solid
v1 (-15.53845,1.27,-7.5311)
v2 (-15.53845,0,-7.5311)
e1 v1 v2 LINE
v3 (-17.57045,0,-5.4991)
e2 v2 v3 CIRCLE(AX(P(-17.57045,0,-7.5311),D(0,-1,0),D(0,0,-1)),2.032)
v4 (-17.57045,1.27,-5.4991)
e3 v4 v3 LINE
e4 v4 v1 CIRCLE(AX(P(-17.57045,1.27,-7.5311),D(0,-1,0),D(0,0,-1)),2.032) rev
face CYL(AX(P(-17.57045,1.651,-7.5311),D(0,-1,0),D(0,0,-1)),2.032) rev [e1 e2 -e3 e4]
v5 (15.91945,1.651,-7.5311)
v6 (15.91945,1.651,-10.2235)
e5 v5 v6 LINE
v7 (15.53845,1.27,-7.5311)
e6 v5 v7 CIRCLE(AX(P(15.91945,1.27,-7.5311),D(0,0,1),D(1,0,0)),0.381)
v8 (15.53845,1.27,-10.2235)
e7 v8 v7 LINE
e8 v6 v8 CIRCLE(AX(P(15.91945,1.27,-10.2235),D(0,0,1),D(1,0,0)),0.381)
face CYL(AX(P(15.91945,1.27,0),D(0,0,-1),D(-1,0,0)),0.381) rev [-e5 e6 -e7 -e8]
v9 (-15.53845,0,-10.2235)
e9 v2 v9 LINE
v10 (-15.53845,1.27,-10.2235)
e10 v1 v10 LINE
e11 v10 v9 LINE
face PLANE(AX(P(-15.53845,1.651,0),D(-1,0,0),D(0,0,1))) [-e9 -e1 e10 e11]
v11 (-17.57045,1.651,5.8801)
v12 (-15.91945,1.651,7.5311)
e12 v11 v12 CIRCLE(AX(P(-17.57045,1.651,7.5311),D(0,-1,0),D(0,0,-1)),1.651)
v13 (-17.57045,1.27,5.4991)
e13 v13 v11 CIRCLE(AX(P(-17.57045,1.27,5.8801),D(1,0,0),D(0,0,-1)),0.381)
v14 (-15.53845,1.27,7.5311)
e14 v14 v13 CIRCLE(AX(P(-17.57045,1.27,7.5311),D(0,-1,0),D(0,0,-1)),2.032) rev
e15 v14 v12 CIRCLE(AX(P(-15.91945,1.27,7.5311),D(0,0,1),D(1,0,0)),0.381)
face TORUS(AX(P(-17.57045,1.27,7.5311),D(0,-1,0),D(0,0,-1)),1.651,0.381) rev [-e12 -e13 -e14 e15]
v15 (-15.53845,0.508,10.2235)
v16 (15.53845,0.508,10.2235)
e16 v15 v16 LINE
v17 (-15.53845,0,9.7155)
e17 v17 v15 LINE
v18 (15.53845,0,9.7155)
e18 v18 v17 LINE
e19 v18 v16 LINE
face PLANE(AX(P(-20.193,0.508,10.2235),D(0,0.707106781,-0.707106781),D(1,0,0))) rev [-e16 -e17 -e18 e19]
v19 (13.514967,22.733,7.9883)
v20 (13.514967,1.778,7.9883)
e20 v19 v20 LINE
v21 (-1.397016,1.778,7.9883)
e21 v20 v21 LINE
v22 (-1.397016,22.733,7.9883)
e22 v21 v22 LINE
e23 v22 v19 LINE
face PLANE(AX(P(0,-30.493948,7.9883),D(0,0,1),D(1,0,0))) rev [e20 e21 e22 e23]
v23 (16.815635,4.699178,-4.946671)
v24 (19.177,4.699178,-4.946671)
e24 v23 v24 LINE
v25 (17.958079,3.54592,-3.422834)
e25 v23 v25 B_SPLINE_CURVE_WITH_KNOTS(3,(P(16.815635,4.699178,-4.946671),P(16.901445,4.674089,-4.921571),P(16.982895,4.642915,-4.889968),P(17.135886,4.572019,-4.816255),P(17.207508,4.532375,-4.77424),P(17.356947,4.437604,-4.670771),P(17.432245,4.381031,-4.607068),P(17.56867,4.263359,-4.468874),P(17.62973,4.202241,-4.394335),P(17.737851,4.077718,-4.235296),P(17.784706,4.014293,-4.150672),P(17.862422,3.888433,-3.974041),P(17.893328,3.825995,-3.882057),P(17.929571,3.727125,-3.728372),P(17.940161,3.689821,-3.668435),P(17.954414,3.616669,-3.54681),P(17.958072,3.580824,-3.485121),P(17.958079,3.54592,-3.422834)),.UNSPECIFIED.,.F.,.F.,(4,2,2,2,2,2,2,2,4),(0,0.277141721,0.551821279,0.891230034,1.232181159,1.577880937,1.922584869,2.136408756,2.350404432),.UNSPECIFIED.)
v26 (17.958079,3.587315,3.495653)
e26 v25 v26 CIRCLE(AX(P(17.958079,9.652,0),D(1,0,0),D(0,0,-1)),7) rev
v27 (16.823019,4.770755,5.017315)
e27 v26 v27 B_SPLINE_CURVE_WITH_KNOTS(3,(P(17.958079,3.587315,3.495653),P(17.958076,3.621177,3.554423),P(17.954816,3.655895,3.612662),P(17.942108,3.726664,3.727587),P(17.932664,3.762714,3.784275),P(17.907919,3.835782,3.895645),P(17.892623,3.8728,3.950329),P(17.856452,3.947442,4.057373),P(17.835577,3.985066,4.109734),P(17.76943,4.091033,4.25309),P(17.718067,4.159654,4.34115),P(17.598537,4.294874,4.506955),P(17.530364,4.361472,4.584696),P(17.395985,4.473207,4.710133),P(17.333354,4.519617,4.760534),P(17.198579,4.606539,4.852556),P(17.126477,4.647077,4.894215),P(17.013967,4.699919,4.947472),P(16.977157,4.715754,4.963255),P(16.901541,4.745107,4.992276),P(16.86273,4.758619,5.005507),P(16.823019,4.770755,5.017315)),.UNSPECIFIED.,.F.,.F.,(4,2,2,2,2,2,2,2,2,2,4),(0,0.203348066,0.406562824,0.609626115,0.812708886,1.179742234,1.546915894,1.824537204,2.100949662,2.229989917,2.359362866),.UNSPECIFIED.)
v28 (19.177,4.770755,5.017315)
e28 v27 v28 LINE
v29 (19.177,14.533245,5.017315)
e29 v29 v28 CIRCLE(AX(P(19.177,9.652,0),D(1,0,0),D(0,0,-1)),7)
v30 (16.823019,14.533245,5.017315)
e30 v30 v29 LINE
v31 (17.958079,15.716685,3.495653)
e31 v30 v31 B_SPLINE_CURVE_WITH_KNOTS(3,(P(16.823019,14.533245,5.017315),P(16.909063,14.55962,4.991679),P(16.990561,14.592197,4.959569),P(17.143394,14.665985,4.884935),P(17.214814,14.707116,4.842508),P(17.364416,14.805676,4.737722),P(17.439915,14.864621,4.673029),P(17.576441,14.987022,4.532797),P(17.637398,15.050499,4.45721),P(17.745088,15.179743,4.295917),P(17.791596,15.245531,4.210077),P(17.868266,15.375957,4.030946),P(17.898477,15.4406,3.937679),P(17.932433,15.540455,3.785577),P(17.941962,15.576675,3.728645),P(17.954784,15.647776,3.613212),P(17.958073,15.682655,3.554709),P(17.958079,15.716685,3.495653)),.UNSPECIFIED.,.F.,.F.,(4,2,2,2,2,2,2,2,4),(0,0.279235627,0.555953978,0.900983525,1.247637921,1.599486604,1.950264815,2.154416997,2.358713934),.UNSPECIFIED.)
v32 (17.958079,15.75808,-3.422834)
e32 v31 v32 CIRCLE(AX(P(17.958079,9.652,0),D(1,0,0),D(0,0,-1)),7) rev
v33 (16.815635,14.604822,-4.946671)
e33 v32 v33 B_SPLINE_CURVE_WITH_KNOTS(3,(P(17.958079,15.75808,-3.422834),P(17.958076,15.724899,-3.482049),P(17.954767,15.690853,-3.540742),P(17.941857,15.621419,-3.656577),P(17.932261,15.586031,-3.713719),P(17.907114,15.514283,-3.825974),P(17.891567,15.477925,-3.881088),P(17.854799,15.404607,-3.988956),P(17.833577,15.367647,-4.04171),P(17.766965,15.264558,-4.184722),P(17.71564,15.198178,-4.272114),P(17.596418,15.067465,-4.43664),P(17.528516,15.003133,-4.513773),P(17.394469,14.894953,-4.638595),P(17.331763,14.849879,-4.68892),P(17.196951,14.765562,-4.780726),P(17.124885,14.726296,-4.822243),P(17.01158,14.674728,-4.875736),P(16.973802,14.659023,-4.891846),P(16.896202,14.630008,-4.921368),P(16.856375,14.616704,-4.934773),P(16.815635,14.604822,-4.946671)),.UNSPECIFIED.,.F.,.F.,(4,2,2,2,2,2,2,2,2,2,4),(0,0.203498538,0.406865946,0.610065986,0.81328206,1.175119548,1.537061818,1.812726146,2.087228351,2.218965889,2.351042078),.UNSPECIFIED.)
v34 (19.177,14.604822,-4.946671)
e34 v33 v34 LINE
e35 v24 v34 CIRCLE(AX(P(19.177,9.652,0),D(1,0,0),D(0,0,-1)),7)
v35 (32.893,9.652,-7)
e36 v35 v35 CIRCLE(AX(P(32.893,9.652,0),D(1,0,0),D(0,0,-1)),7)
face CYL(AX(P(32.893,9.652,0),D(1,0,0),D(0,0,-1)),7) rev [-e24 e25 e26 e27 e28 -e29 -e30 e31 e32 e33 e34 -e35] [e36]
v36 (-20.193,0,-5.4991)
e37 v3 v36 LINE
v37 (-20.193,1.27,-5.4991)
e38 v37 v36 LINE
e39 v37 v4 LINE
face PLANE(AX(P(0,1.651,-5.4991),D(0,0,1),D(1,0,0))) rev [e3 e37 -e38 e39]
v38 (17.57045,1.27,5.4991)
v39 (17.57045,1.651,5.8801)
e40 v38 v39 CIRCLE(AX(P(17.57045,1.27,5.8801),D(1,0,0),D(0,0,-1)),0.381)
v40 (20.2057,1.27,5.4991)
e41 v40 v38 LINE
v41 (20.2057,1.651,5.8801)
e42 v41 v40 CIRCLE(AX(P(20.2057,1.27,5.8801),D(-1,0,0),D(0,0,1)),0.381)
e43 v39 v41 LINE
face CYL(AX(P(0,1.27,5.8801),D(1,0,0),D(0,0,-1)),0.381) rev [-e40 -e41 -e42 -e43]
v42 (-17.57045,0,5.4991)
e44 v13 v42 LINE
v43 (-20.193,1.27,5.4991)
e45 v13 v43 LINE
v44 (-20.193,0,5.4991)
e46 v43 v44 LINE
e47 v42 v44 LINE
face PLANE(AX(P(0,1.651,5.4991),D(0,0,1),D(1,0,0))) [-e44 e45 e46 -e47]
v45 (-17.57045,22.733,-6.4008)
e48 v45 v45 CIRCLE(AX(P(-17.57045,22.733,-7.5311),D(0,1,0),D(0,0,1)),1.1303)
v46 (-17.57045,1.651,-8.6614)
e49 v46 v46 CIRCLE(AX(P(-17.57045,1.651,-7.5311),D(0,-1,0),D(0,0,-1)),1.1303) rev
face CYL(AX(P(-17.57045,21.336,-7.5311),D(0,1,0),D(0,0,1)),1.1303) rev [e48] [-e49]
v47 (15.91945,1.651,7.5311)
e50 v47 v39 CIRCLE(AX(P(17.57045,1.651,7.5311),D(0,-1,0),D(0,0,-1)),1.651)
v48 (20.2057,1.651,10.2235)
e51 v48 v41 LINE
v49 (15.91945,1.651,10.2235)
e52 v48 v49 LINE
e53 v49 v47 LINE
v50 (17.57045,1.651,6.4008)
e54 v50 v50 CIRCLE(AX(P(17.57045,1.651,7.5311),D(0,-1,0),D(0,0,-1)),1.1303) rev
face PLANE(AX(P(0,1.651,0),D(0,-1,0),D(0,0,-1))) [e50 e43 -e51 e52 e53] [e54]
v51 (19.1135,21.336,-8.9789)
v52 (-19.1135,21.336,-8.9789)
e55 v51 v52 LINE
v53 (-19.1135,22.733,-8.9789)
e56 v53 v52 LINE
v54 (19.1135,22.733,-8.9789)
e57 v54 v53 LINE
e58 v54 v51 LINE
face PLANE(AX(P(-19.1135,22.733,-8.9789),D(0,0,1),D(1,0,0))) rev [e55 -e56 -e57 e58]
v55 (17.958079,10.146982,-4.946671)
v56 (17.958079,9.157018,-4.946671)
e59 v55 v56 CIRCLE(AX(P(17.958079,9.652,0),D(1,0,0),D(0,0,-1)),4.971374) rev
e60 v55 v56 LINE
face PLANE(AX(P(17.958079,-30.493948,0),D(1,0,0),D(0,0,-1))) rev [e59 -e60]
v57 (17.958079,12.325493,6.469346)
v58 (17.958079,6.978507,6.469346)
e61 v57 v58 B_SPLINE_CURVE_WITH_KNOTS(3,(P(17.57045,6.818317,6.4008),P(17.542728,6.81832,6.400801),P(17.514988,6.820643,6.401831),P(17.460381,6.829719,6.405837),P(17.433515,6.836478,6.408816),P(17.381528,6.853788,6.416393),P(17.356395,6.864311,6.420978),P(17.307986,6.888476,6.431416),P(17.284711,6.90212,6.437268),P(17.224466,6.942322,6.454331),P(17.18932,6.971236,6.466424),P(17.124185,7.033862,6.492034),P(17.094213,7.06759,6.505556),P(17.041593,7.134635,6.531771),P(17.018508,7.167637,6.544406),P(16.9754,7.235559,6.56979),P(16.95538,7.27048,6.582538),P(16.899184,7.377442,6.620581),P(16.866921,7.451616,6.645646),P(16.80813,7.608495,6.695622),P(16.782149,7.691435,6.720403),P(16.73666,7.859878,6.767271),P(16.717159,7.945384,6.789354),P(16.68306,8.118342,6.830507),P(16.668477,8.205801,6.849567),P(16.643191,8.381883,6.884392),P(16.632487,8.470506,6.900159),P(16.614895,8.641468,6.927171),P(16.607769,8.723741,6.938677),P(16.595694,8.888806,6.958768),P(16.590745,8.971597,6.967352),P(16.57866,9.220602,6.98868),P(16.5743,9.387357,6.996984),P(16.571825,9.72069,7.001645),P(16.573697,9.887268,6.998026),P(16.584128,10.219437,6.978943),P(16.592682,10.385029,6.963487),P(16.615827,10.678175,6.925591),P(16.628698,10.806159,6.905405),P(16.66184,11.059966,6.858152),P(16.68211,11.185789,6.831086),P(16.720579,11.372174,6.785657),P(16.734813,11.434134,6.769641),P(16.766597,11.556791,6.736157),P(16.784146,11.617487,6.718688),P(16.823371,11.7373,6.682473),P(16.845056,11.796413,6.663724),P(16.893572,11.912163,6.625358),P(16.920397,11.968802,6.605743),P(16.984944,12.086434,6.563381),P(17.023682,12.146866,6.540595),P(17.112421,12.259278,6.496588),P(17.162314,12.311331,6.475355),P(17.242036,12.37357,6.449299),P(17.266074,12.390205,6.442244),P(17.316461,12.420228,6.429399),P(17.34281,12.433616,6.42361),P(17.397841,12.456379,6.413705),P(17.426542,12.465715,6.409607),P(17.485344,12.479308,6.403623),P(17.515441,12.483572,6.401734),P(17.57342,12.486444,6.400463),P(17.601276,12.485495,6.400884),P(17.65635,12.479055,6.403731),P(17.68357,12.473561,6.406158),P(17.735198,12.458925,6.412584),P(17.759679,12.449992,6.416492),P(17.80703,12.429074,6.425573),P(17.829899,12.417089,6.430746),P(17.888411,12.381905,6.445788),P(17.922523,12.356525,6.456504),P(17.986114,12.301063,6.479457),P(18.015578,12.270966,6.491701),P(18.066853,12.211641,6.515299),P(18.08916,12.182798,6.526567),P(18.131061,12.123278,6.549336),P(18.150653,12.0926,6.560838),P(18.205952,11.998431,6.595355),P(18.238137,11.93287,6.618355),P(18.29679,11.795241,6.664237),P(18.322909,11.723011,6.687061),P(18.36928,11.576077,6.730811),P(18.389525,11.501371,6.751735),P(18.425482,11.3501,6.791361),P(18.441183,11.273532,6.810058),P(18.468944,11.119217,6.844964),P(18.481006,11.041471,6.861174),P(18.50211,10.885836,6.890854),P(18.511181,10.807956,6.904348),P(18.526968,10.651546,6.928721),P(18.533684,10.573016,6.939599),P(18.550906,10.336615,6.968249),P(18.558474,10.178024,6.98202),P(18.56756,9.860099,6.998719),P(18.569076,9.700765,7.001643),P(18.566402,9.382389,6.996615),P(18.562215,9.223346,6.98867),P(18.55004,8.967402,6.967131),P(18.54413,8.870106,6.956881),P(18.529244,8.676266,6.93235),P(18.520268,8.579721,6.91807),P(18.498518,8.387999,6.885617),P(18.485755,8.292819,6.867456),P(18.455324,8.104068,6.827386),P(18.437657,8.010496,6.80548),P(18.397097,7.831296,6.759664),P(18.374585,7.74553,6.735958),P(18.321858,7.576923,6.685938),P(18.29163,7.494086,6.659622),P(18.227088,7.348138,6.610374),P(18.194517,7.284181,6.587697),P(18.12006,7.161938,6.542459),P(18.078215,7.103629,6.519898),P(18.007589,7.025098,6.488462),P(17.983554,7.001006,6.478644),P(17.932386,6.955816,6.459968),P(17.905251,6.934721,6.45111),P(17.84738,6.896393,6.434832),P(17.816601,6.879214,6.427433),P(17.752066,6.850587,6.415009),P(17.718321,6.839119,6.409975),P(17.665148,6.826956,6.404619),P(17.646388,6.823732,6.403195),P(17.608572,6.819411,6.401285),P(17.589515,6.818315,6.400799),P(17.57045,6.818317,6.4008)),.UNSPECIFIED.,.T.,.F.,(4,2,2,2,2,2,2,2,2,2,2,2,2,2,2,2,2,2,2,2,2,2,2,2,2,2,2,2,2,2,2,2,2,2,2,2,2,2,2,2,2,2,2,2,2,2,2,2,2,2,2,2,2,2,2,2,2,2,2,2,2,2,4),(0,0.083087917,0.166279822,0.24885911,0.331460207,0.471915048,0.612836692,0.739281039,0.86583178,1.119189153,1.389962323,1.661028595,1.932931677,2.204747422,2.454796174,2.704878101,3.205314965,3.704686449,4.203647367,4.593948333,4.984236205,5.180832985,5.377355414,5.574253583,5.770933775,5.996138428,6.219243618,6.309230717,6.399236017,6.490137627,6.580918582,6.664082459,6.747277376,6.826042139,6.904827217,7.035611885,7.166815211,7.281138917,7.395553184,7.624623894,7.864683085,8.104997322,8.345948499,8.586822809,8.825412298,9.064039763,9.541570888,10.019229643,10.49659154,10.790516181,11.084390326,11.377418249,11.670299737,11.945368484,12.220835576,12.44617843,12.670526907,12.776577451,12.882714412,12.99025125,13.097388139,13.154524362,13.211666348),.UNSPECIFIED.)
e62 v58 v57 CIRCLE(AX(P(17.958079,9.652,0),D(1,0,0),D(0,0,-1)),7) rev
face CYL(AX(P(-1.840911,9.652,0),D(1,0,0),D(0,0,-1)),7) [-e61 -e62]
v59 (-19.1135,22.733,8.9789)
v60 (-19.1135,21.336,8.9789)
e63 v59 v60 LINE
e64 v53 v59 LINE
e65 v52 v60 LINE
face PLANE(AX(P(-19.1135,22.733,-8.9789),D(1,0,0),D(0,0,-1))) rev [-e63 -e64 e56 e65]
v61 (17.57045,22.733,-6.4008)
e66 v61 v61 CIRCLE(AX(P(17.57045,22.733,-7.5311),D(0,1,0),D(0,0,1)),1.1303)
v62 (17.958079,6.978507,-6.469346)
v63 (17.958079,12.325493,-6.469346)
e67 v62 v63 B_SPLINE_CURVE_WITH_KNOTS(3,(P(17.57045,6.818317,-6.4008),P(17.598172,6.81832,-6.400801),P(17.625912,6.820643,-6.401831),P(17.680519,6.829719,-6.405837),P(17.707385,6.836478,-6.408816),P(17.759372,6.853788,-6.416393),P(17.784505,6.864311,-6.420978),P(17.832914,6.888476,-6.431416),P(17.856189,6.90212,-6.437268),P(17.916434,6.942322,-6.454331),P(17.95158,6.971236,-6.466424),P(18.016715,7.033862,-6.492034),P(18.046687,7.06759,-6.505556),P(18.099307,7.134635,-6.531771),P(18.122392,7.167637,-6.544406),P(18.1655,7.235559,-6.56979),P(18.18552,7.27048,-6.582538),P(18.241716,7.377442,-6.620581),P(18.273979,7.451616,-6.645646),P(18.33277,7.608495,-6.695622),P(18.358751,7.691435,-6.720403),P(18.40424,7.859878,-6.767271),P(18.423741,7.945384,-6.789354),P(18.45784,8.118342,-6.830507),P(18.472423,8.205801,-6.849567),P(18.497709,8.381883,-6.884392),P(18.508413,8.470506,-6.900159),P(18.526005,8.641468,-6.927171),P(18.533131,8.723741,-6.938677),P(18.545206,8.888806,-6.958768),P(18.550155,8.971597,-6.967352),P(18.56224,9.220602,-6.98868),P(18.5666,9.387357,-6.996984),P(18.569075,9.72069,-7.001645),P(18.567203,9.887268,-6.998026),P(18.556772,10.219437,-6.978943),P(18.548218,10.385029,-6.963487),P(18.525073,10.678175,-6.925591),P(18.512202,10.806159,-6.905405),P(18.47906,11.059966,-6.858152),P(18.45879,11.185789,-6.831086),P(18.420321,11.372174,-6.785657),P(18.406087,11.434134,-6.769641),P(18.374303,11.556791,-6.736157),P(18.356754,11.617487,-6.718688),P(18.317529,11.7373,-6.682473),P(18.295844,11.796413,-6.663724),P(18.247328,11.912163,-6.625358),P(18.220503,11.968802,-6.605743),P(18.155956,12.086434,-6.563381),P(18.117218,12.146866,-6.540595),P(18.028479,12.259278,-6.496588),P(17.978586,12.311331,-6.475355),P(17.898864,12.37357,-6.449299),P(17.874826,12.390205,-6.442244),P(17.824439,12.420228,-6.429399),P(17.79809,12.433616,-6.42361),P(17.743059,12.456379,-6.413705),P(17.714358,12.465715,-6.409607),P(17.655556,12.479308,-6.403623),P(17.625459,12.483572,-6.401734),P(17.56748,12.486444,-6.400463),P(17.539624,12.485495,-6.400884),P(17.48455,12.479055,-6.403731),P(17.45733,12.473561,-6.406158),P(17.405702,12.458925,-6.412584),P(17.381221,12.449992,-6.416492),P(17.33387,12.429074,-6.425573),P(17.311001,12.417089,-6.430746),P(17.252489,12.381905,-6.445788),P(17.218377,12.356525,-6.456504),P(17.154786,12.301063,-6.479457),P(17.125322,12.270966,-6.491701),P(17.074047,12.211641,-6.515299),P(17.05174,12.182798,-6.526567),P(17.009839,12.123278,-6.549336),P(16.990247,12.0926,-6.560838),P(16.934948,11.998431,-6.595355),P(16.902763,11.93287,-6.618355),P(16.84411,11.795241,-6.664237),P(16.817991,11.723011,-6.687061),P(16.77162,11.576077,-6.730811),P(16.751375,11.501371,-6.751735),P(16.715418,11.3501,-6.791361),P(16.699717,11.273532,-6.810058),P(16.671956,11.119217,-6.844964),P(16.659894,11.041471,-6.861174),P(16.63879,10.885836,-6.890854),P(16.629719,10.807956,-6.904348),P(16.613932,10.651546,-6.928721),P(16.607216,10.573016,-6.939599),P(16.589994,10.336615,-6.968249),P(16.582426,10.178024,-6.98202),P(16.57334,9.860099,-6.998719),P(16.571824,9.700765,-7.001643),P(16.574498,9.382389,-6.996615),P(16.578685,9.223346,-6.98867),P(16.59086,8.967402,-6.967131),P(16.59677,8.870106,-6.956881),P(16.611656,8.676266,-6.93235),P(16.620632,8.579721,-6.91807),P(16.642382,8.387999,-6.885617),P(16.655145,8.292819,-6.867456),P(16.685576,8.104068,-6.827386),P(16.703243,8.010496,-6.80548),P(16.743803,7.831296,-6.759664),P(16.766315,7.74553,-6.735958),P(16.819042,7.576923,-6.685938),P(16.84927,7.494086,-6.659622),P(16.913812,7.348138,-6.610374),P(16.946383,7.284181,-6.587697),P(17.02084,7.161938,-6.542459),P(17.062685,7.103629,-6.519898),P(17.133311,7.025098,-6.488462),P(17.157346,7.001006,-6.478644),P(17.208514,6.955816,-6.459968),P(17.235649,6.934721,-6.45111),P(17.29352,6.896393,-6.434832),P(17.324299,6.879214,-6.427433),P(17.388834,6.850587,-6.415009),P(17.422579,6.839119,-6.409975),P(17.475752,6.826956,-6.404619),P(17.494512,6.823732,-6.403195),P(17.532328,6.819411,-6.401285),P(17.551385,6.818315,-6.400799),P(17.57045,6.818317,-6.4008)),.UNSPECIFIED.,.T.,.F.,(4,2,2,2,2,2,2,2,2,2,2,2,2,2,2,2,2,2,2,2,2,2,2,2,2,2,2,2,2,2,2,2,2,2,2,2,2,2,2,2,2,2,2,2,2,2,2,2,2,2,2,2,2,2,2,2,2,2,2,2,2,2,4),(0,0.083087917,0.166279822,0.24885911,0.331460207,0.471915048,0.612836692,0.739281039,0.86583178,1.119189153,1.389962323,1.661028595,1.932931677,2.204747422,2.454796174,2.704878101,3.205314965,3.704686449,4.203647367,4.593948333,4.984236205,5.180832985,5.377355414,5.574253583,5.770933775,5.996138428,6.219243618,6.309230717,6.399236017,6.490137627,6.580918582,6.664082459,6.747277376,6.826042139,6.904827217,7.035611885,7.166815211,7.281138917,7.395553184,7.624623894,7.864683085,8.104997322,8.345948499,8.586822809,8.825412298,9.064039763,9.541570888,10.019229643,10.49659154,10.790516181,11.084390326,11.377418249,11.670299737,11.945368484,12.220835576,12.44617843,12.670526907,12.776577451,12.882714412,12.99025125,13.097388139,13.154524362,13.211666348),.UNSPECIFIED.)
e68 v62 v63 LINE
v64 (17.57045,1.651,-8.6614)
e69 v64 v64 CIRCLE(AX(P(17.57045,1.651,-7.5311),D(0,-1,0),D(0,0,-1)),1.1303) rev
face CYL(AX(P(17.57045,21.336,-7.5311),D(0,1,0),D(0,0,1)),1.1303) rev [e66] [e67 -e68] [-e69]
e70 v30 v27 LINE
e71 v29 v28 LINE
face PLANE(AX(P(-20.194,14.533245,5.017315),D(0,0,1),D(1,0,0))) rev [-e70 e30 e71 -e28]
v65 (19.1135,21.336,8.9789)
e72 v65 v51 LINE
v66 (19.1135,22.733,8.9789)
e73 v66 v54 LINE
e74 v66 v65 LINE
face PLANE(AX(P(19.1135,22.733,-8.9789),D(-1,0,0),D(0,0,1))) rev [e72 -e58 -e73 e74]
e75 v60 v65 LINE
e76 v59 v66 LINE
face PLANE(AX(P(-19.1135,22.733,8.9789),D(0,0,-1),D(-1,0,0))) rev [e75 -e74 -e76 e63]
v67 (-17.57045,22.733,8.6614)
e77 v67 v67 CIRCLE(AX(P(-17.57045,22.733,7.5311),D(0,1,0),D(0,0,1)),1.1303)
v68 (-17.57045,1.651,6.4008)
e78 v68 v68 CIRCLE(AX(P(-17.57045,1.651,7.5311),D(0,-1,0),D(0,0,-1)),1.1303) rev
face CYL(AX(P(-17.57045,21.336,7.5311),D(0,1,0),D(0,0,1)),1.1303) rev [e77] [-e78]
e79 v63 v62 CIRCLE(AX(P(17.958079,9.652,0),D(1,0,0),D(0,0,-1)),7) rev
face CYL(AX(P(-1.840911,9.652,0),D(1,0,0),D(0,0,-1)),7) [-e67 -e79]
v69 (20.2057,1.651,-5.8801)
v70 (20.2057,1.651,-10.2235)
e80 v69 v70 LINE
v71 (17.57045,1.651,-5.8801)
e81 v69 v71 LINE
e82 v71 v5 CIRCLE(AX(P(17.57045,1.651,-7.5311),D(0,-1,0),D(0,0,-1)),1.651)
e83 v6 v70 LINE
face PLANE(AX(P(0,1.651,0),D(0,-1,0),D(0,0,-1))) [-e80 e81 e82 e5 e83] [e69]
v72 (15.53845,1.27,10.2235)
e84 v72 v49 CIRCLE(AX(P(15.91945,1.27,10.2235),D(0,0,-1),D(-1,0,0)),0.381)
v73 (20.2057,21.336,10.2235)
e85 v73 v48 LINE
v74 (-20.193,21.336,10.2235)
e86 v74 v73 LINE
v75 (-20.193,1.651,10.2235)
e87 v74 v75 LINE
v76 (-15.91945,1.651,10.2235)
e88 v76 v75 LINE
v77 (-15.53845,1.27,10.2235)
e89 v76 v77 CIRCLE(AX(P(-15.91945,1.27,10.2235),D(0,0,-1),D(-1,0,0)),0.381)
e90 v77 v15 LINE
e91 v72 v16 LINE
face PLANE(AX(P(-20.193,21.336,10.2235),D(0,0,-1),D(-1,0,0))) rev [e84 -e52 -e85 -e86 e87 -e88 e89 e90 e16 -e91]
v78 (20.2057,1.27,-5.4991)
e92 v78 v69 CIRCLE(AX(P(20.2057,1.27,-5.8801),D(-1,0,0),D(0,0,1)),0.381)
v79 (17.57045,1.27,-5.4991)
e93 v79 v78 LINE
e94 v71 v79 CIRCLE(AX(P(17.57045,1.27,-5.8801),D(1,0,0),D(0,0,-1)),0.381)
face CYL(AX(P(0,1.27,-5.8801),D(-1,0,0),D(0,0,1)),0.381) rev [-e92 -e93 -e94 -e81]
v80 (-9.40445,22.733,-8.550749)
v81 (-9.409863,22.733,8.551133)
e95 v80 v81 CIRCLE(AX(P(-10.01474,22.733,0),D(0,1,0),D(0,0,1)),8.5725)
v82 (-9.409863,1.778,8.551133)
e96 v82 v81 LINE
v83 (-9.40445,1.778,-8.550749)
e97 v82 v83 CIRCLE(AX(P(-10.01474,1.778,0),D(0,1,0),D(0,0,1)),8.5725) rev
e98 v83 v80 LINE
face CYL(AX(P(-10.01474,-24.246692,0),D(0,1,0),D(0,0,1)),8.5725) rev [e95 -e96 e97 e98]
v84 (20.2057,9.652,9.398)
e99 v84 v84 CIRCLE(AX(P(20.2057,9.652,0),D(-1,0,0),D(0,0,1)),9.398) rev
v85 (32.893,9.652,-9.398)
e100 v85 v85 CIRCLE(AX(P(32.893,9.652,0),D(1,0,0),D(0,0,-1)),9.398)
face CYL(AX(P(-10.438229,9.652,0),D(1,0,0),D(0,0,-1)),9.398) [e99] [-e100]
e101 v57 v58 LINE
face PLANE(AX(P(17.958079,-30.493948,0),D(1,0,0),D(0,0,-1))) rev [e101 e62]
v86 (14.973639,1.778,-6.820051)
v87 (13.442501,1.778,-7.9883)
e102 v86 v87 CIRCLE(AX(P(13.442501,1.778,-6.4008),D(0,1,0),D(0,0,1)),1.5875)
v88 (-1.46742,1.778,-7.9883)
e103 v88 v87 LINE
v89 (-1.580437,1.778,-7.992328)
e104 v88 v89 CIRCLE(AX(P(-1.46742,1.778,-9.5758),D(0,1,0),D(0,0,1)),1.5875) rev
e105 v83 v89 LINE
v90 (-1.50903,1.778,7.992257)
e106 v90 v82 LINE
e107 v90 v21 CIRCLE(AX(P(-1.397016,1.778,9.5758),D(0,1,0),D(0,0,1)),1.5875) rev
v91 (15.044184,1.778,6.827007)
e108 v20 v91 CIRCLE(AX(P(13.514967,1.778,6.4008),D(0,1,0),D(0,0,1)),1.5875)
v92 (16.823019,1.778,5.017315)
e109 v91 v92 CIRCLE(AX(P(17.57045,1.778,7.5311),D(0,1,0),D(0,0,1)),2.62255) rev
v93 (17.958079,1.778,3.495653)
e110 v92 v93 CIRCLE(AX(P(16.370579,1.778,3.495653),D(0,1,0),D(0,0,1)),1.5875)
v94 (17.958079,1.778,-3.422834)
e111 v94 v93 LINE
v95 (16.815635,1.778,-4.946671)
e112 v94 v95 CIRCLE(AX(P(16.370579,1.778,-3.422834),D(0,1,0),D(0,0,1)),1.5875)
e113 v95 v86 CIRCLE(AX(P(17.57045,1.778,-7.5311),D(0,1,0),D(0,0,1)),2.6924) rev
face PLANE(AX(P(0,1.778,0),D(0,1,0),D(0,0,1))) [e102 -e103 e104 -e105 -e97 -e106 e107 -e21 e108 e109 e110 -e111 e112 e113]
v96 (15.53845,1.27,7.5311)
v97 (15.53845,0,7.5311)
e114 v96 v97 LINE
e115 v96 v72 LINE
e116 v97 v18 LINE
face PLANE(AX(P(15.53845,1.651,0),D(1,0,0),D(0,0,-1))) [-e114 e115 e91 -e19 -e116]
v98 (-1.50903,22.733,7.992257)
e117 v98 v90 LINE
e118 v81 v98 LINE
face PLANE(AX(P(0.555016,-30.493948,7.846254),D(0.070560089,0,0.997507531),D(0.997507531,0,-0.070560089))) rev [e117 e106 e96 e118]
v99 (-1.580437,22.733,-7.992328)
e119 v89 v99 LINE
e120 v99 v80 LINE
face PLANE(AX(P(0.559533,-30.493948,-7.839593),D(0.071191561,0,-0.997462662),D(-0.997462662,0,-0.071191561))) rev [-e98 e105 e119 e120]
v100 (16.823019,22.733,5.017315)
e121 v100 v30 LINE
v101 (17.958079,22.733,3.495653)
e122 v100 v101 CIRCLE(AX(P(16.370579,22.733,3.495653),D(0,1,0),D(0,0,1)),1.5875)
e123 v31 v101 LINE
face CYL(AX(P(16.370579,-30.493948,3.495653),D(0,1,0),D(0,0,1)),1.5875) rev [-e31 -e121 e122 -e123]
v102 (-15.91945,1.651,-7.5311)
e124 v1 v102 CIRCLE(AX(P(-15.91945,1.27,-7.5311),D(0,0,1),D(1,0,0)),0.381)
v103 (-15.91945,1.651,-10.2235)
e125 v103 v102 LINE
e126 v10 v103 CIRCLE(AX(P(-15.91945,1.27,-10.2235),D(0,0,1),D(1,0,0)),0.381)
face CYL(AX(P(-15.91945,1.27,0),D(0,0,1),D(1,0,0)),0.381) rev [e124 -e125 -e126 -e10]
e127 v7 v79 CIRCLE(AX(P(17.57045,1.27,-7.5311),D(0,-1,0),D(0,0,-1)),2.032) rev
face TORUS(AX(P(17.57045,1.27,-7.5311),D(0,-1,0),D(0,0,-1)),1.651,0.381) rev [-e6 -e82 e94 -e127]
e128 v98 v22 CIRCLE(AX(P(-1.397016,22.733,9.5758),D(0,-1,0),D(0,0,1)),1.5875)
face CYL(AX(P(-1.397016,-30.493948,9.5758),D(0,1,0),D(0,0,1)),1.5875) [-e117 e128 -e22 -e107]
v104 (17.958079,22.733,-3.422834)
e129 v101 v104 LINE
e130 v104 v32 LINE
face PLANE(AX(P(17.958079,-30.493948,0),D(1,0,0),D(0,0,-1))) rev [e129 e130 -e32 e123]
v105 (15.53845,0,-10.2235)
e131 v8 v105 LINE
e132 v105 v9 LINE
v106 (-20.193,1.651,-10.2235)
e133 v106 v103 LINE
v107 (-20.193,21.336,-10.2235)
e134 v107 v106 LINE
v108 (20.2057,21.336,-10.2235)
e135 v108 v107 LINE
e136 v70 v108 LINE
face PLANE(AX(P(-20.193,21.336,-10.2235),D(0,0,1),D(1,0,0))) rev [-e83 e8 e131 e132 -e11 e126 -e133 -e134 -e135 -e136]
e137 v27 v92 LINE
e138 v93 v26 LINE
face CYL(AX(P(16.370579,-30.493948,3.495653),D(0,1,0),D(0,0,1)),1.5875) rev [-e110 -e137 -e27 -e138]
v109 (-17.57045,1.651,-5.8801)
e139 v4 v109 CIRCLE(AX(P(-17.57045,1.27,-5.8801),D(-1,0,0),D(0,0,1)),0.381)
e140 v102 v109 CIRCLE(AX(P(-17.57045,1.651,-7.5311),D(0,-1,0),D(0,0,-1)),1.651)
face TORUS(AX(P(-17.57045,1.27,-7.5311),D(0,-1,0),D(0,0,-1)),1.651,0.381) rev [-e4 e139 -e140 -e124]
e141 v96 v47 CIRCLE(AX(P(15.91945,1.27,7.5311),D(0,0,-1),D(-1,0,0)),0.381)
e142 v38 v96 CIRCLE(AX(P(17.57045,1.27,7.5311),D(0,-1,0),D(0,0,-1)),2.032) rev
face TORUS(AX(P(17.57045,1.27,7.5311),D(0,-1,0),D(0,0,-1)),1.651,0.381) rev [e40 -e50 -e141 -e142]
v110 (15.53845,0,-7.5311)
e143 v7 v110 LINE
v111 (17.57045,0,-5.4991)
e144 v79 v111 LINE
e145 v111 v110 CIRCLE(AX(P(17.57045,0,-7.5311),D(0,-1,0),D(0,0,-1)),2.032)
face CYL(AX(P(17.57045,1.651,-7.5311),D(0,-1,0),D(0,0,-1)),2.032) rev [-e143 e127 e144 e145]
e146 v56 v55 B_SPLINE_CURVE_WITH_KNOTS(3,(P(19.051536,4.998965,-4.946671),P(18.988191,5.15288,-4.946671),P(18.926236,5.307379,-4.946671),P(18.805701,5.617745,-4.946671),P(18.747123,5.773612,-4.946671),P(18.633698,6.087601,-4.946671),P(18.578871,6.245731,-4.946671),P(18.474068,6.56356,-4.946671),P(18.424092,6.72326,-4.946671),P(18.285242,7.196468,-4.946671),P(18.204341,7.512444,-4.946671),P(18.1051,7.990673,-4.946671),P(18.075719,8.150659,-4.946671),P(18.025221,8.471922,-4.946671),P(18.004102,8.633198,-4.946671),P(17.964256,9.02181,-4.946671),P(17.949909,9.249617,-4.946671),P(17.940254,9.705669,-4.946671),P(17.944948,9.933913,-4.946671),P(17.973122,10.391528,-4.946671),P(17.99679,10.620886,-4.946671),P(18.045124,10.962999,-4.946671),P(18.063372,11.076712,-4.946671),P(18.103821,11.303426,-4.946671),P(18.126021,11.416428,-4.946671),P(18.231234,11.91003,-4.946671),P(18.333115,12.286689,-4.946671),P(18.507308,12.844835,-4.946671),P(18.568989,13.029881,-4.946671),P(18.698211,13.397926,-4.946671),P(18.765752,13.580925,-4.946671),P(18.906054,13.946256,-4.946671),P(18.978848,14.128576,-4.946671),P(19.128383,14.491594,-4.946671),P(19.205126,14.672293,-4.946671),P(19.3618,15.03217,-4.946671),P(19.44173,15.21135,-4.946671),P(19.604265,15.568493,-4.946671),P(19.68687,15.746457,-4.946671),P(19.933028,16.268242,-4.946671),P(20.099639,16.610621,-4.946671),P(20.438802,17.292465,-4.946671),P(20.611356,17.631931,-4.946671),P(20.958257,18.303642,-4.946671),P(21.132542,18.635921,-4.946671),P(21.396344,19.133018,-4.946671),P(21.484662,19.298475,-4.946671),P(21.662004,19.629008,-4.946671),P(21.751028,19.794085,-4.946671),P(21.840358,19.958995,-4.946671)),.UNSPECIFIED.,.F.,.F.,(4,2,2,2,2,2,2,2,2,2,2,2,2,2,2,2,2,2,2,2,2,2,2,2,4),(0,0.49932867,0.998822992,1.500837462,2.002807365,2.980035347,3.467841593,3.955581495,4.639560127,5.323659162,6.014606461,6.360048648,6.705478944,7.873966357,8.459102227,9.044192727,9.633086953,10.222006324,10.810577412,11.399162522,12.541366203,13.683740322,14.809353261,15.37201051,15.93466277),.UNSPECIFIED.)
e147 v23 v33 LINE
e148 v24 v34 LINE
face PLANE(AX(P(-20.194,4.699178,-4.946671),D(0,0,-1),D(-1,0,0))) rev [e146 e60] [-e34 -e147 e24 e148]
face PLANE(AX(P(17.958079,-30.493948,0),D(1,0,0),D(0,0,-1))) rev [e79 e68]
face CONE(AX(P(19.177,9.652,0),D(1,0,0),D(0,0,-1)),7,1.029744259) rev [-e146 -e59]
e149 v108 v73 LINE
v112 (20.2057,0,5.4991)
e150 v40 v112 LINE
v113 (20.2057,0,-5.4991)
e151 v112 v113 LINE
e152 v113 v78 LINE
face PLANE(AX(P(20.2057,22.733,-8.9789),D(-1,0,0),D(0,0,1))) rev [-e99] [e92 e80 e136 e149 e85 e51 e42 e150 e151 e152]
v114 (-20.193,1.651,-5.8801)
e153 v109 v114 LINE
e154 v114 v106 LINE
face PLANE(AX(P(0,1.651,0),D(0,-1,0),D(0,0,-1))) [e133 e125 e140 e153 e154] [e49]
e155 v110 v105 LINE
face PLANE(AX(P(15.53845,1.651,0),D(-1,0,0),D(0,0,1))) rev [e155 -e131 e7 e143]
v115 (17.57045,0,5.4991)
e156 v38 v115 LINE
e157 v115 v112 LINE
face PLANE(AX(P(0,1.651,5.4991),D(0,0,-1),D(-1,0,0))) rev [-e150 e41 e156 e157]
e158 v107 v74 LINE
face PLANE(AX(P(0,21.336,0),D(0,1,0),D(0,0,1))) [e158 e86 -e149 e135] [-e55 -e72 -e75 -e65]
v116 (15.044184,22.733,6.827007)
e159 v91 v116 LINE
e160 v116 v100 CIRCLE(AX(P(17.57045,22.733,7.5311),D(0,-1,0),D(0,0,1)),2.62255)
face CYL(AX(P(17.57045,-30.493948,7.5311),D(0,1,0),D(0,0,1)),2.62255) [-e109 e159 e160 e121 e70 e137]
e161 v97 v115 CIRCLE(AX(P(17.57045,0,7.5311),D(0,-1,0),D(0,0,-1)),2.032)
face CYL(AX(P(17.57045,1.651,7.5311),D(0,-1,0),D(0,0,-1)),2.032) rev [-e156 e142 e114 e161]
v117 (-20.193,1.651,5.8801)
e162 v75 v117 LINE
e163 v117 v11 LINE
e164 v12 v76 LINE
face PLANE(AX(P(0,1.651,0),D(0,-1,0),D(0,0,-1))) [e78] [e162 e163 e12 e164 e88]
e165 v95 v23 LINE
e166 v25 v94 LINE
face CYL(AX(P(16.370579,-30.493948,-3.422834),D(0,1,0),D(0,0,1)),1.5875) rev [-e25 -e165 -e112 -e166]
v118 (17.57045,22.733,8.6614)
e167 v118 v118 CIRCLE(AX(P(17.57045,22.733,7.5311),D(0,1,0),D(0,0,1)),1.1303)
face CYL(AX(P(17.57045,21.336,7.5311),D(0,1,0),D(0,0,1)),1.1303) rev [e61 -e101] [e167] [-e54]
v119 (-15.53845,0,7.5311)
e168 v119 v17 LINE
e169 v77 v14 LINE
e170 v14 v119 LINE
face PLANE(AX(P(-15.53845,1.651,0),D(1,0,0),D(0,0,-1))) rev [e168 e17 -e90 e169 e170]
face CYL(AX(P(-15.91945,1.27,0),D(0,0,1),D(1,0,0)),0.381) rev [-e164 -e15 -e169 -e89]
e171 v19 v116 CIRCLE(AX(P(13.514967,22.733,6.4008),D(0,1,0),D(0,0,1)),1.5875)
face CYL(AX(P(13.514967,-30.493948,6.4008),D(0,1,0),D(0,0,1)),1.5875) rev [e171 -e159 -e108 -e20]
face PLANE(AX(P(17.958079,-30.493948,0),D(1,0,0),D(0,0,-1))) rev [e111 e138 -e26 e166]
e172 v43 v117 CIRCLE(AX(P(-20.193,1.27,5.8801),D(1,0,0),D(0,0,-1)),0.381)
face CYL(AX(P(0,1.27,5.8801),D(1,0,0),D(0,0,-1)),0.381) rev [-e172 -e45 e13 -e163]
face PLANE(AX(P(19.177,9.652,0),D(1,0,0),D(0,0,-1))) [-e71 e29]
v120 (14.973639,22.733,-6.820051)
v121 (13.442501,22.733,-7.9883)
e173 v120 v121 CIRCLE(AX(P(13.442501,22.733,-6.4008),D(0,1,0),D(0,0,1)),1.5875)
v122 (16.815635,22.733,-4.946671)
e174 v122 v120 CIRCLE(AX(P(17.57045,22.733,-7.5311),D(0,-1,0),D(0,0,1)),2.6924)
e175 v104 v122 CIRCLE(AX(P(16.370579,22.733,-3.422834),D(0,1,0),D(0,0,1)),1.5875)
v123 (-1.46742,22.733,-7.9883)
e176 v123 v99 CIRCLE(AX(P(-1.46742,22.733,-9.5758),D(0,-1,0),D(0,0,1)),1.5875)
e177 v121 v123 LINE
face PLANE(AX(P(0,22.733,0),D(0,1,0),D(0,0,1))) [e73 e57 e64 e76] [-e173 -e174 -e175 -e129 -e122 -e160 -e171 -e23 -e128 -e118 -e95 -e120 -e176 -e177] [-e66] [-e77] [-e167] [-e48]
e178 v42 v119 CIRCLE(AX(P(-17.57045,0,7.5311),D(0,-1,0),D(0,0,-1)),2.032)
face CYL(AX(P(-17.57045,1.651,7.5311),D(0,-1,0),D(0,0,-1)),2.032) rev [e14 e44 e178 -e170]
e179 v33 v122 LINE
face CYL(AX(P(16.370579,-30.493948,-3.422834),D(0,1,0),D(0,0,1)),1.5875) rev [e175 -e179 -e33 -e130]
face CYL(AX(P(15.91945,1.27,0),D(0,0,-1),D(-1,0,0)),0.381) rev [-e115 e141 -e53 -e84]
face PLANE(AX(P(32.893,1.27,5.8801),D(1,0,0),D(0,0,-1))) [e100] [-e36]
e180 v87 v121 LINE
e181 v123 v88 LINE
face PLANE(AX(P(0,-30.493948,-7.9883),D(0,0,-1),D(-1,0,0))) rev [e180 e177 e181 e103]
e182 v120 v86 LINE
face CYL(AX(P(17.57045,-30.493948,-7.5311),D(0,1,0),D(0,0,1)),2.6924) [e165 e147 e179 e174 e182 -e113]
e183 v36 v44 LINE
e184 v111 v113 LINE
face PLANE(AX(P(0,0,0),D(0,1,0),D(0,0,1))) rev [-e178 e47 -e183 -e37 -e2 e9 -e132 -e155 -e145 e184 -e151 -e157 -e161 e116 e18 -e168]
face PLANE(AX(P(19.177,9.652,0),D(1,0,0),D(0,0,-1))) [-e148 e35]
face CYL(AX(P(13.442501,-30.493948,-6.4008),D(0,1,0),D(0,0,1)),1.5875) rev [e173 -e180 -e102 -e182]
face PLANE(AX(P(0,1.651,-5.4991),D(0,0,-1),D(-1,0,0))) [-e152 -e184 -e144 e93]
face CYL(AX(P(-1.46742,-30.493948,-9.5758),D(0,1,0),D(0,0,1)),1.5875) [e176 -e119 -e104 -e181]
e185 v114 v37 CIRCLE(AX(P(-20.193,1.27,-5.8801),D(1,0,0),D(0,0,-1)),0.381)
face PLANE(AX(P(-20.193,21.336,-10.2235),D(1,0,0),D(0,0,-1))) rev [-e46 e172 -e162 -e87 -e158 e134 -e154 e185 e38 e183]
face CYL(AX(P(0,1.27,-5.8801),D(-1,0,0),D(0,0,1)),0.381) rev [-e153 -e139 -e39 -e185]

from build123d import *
from build123d.topology import SkipClean

# Parameters (mm, degrees)
SKETCH1_W                          = 40.386
SKETCH1_H                          = 20.447
BOSS_EXTRUDE1_DEPTH                = 21.336
CHAMFER1_SIZE                      = 0.508
F_2_CLEARANCE_HOLE1_D              = 2.2606
SKETCH6_R                          = 8.5725
CUT_EXTRUDE1_DEPTH                 = 19.558
CUT_EXTRUDE4_DEPTH                 = 19.558
FILLET3_R                          = 1.5875
CUT_EXTRUDE5_START                 = -1.651
CUT_EXTRUDE5_OUTLINE_R             = 1.1303
CUT_EXTRUDE5_DEPTH                 = 1.651
FILLET5_R                          = 0.381
BOSS_EXTRUDE3_START                = 1.397
SKETCH12_W                         = 38.227
SKETCH12_H                         = 17.9578
SKETCH12_R                         = 1.1303
BOSS_EXTRUDE3_DEPTH                = 1.397
BOSS_EXTRUDE4_DEPTH                = 12.7
TAPPED_HOLE_FOR_PG9_CONDUIT1_D     = 14
TAPPED_HOLE_FOR_PG9_CONDUIT1_DEPTH = 13.716
TAPPED_HOLE_FOR_PG9_CONDUIT1_TIP   = 4.206024333
BOSS_EXTRUDE5_START                = -1.218921199
SKETCH24_R                         = 7
BOSS_EXTRUDE5_DEPTH                = 1.218921199
CUT_EXTRUDE8_REACH                 = 48.597
CUT_EXTRUDE11_START                = -12.6873
SKETCH26_R                         = 9.398
CUT_EXTRUDE11_DEPTH                = 12.6873


# Read off the part's stored shape, not the designer's step: Cut-Extrude5
with BuildPart() as part:
    # Sketch1 → Boss-Extrude1 (new body)
    with BuildSketch(Plane(origin=(0, 0, 0), x_dir=(1, 0, 0), z_dir=(0, 1, 0))):
        Rectangle(SKETCH1_W, SKETCH1_H)
    extrude(amount=BOSS_EXTRUDE1_DEPTH)

    # Chamfer1
    chamfer1_edges = [part.edges().sort_by_distance(p)[0] for p in [
        (0, 0, 10.2235),
    ]]
    chamfer(chamfer1_edges, length=CHAMFER1_SIZE)

    # #2 Clearance Hole1 (through all)
    with Locations(Plane(origin=(0, 21.336, 0), x_dir=(1, 0, 0), z_dir=(0, 1, 0))):
        with Locations((17.57045, -7.5311), (-17.57045, 7.5311), (-17.57045, -7.5311), (17.57045, 7.5311)):
            Hole(F_2_CLEARANCE_HOLE1_D / 2)

    # Sketch6 → Cut-Extrude1 (cut)
    with BuildSketch(Plane(origin=(0, 21.336, 0), x_dir=(1, 0, 0), z_dir=(0, 1, 0))):
        with Locations(Location((-10.014739789, 0, 0), (0, 0, 270))):
            Circle(SKETCH6_R)
    extrude(amount=-CUT_EXTRUDE1_DEPTH, mode=Mode.SUBTRACT)

    # Sketch10 → Cut-Extrude4 (cut)
    with BuildSketch(Plane(origin=(0, 21.336, 0), x_dir=(1, 0, 0), z_dir=(0, 1, 0))):
        with BuildLine():
            Line((-1.45309254, -7.9883), (14.988060281, -7.9883))
            ThreePointArc((14.988060281, -7.9883), (15.691271985, -5.7017672), (17.958078801, -4.937355137))
            Line((17.958078801, -4.937355137), (17.958078801, 4.866749859))
            ThreePointArc((17.958078801, 4.866749859), (15.641892996, 5.652354237), (14.917152821, 7.9883))
            Line((14.917152821, 7.9883), (-1.524, 7.9883))
            Line((-1.524, 7.9883), (-9.404450133, 8.550748668))
            ThreePointArc((-9.404450133, 8.550748668), (-1.442240219, -0.00271347), (-9.409863426, -8.551133307))
            Line((-9.409863426, -8.551133307), (-1.45309254, -7.9883))
        make_face()
    extrude(amount=-CUT_EXTRUDE4_DEPTH, mode=Mode.SUBTRACT)

    # Fillet3
    # the kernel refuses this fillet: 1.5875 mm, written as the material it adds along each edge
    with BuildSketch(Plane(origin=(17.958078801, 21.336, 4.937355137), x_dir=(0, 0, -1), z_dir=(0, -1, 0))) as fillet3_piece_1:
        with BuildLine():
            CenterArc((1.441701842, -1.5875), FILLET3_R, 90, 73.441052757)
            ThreePointArc((-0.079959812, -1.13505988), (0.022321973, -0.571918824), (0, 0))
            Line((0, 0), (1.441701842, 0))
        make_face()
    extrude(amount=19.558)
    with BuildSketch(Plane(origin=(14.988060281, 21.336, 7.9883), x_dir=(0.048272098089337995, 0, -0.9988342227547339), z_dir=(0, -1, 0))) as fillet3_piece_2:
        with BuildLine():
            CenterArc((1.514540022, -1.548008005), FILLET3_R, 102.806774289, 74.426362957)
            Line((-0.071109307, -1.47137605), (0, 0))
            ThreePointArc((0, 0), (0.581324376, -0.065240775), (1.162648753, 0))
        make_face()
    extrude(amount=19.558)
    with BuildSketch(Plane(origin=(14.917152821, 21.336, -7.9883), x_dir=(-1, 0, 0), z_dir=(0, -1, 0))) as fillet3_piece_3:
        with BuildLine():
            CenterArc((1.474652181, -1.5875), FILLET3_R, 90, 74.686818151)
            ThreePointArc((-0.056486306, -1.168249258), (0.035961125, -0.587228986), (0, 0))
            Line((0, 0), (1.474652181, 0))
        make_face()
    extrude(amount=19.558)
    with BuildSketch(Plane(origin=(17.958078801, 21.336, -4.866749859), x_dir=(-0.9975619874511197, 0, -0.06978596701753238), z_dir=(0, -1, 0))) as fillet3_piece_4:
        with BuildLine():
            CenterArc((1.48286456, -1.551181233), FILLET3_R, 102.279418141, 73.718887891)
            Line((-0.100765095, -1.44039601), (0, 0))
            ThreePointArc((0, 0), (0.572618009, -0.061596629), (1.145236017, 0))
        make_face()
    extrude(amount=19.558)
    # the kernel refuses this fillet: 1.5875 mm, written as the material it takes off along each edge
    with BuildSketch(Plane(origin=(-1.45309254, 21.476192389, 7.9883), x_dir=(-0.9975075307142005, 0, 0.07056008906214724), z_dir=(0, -1, 0))) as fillet3_2_piece_1:
        with BuildLine():
            CenterArc((FILLET3_R * 0.0353240666066, -FILLET3_R), FILLET3_R, 90, 4.046157505)
            Line((-FILLET3_R * 0.0352360224555, -FILLET3_R * 0.0024924692858), (0, 0))
            Line((0, 0), (FILLET3_R * 0.0353240666066, 0))
        make_face()
    extrude(amount=19.698192389, mode=Mode.SUBTRACT)
    with BuildSketch(Plane(origin=(-1.524, 21.477450207, -7.9883), x_dir=(-0.9974626617850719, 0, -0.0711915609088555), z_dir=(0, -1, 0))) as fillet3_2_piece_2:
        with BuildLine():
            CenterArc((FILLET3_R * 0.0356409970864, FILLET3_R), FILLET3_R, 265.917570604, 4.082429396)
            Line((-FILLET3_R * 0.0355505638225, FILLET3_R * 0.00253733821493), (0, 0))
            Line((0, 0), (FILLET3_R * 0.0356409970864, 0))
        make_face()
    extrude(amount=19.699450207, mode=Mode.SUBTRACT)

    # Cut-Extrude5 outline → Cut-Extrude5 (cut)
    # profile 1 of 4: a face of its own
    with BuildSketch(Plane.XZ.offset(CUT_EXTRUDE5_START)):
        with BuildLine():
            Line((15.53845, 10.2235), (15.53845, 7.5311))
            ThreePointArc((15.53845, 7.5311), (16.133609021, 6.094259021), (17.57045, 5.4991))
            Line((17.57045, 5.4991), (20.193, 5.4991))
            Line((20.193, 5.4991), (20.193, 10.2235))
            Line((20.193, 10.2235), (15.53845, 10.2235))
        make_face()
        with Locations((17.57045, 7.5311)):
            Circle(CUT_EXTRUDE5_OUTLINE_R, mode=Mode.SUBTRACT)
    # profile 2 of 4: a face of its own
    with BuildSketch(Plane.XZ.offset(CUT_EXTRUDE5_START)):
        with BuildLine():
            Line((-15.53845, 7.5311), (-15.53845, 10.2235))
            Line((-15.53845, 10.2235), (-20.193, 10.2235))
            Line((-20.193, 10.2235), (-20.193, 5.4991))
            Line((-20.193, 5.4991), (-17.57045, 5.4991))
            ThreePointArc((-17.57045, 5.4991), (-16.133609021, 6.094259021), (-15.53845, 7.5311))
        make_face()
        with Locations((-17.57045, 7.5311)):
            Circle(CUT_EXTRUDE5_OUTLINE_R, mode=Mode.SUBTRACT)
    # profile 3 of 4: a face of its own
    with BuildSketch(Plane.XZ.offset(CUT_EXTRUDE5_START)):
        with BuildLine():
            Line((20.193, -10.2235), (20.193, -5.4991))
            Line((20.193, -5.4991), (17.57045, -5.4991))
            ThreePointArc((17.57045, -5.4991), (16.133609021, -6.094259021), (15.53845, -7.5311))
            Line((15.53845, -7.5311), (15.53845, -10.2235))
            Line((15.53845, -10.2235), (20.193, -10.2235))
        make_face()
        with Locations((17.57045, -7.5311)):
            Circle(CUT_EXTRUDE5_OUTLINE_R, mode=Mode.SUBTRACT)
    # profile 4 of 4: a face of its own
    with BuildSketch(Plane.XZ.offset(CUT_EXTRUDE5_START)):
        with BuildLine():
            Line((-17.57045, -5.4991), (-20.193, -5.4991))
            Line((-20.193, -5.4991), (-20.193, -10.2235))
            Line((-20.193, -10.2235), (-15.53845, -10.2235))
            Line((-15.53845, -10.2235), (-15.53845, -7.5311))
            ThreePointArc((-15.53845, -7.5311), (-16.133609021, -6.094259021), (-17.57045, -5.4991))
        make_face()
        with Locations((-17.57045, -7.5311)):
            Circle(CUT_EXTRUDE5_OUTLINE_R, mode=Mode.SUBTRACT)
    extrude(amount=CUT_EXTRUDE5_DEPTH, mode=Mode.SUBTRACT)

    # Fillet5
    fillet5_edges = [part.edges().sort_by_distance(p)[0] for p in [
        (-18.881725, 1.651, -5.4991),
        (-16.133609021, 1.651, -6.094259021),
        (-15.53845, 1.651, -8.8773),
        (18.881725, 1.651, 5.4991),
        (16.133609021, 1.651, 6.094259021),
        (15.53845, 1.651, 8.8773),
        (15.53845, 1.651, -8.8773),
        (16.133609021, 1.651, -6.094259021),
        (18.881725, 1.651, -5.4991),
        (-15.53845, 1.651, 8.8773),
        (-16.133609021, 1.651, 6.094259021),
        (-18.881725, 1.651, 5.4991),
    ]]
    fillet(fillet5_edges, radius=FILLET5_R)

    # Sketch12 → Boss-Extrude3 (add)
    with BuildSketch(Plane(origin=(0, 21.336, 0), x_dir=(1, 0, 0), z_dir=(0, 1, 0)).offset(BOSS_EXTRUDE3_START)):
        Rectangle(SKETCH12_W, SKETCH12_H)
        with Locations(Location((17.57045, -7.5311, 0), (0, 0, 270))):
            Circle(SKETCH12_R, mode=Mode.SUBTRACT)
        with Locations(Location((17.57045, 7.5311, 0), (0, 0, 270))):
            Circle(SKETCH12_R, mode=Mode.SUBTRACT)
        with Locations(Location((-17.57045, -7.5311, 0), (0, 0, 270))):
            Circle(SKETCH12_R, mode=Mode.SUBTRACT)
        with Locations(Location((-17.57045, 7.5311, 0), (0, 0, 270))):
            Circle(SKETCH12_R, mode=Mode.SUBTRACT)
        with BuildLine():
            Line((17.958078801, -3.495653295), (17.958078801, 3.422833563))
            ThreePointArc((17.958078801, 3.422833563), (17.640752565, 4.375101834), (16.815634884, 4.946671262))
            ThreePointArc((16.815634884, 4.946671262), (15.6506227, 5.643434538), (14.973639127, 6.820050742))
            ThreePointArc((14.973639127, 6.820050742), (14.405463697, 7.662884942), (13.44250064, 7.9883))
            Line((13.44250064, 7.9883), (-1.467419917, 7.9883))
            ThreePointArc((-1.467419917, 7.9883), (-1.523964098, 7.989307326), (-1.58043652, 7.992328024))
            Line((-1.58043652, 7.992328024), (-9.404450133, 8.550748668))
            ThreePointArc((-9.404450133, 8.550748668), (-18.58723936, 0.00271347), (-9.409863426, -8.551133307))
            Line((-9.409863426, -8.551133307), (-1.509029726, -7.992256795))
            ThreePointArc((-1.509029726, -7.992256795), (-1.453057587, -7.989289507), (-1.397015585, -7.9883))
            Line((-1.397015585, -7.9883), (13.514966932, -7.9883))
            ThreePointArc((13.514966932, -7.9883), (14.475058911, -7.665070399), (15.044183775, -6.827006637))
            ThreePointArc((15.044183775, -6.827006637), (15.70015069, -5.692690635), (16.823018922, -5.017314948))
            ThreePointArc((16.823018922, -5.017314948), (17.64305767, -4.444839146), (17.958078801, -3.495653295))
        make_face(mode=Mode.SUBTRACT)
    extrude(amount=-BOSS_EXTRUDE3_DEPTH)

    # Sketch14 → Boss-Extrude4 (add)
    with BuildSketch(Plane(origin=(20.193, 0, 0), x_dir=(0, 0, -1), z_dir=(1, 0, 0))):
        with BuildLine():
            Line((-10.2235, 1.651), (-5.8801, 1.651))
            ThreePointArc((-5.8801, 1.651), (-5.610692316, 1.539407684), (-5.4991, 1.27))
            Line((-5.4991, 1.27), (-5.4991, 0))
            Line((-5.4991, 0), (5.4991, 0))
            Line((5.4991, 0), (5.4991, 1.27))
            ThreePointArc((5.4991, 1.27), (5.610692316, 1.539407684), (5.8801, 1.651))
            Line((5.8801, 1.651), (10.2235, 1.651))
            Line((10.2235, 1.651), (10.2235, 21.336))
            Line((10.2235, 21.336), (-10.2235, 21.336))
            Line((-10.2235, 21.336), (-10.2235, 1.651))
        make_face()
    extrude(amount=BOSS_EXTRUDE4_DEPTH)

    # Tapped Hole for Pg9 Conduit1
    with Locations(Plane(origin=(32.893, 0, 0), x_dir=(0, 0, -1), z_dir=(1, 0, 0))):
        with Locations((0, 9.652)):
            Hole(TAPPED_HOLE_FOR_PG9_CONDUIT1_D / 2, depth=TAPPED_HOLE_FOR_PG9_CONDUIT1_DEPTH)
            with Locations((0, 0, -(TAPPED_HOLE_FOR_PG9_CONDUIT1_DEPTH + TAPPED_HOLE_FOR_PG9_CONDUIT1_TIP / 2))):  # 118° drill point
                Cone(0, TAPPED_HOLE_FOR_PG9_CONDUIT1_D / 2, TAPPED_HOLE_FOR_PG9_CONDUIT1_TIP, mode=Mode.SUBTRACT)

    # Sketch24 → Boss-Extrude5 (add)
    with SkipClean():  # the faces are left unmerged after this step: merging them gives an invalid solid
        with BuildSketch(Plane(origin=(19.177, 0, 0), x_dir=(0, 0, -1), z_dir=(1, 0, 0)).offset(BOSS_EXTRUDE5_START)):
            with Locations((0, 9.652)):
                Circle(SKETCH24_R)
        extrude(amount=BOSS_EXTRUDE5_DEPTH)

    # Sketch25 → Cut-Extrude8 (cut, up to next)
    with BuildSketch(Plane(origin=(19.177, 0, 0), x_dir=(0, 0, -1), z_dir=(1, 0, 0)), mode=Mode.PRIVATE) as cut_extrude8_sk1:
        with BuildLine():
            Line((4.946671262, 4.699178236), (4.946671262, 14.604821764))
            ThreePointArc((4.946671262, 14.604821764), (-0.050283679, 16.651819394), (-5.017314948, 14.533244791))
            Line((-5.017314948, 14.533244791), (-5.017314948, 4.770755209))
            ThreePointArc((-5.017314948, 4.770755209), (-0.050283679, 2.652180606), (4.946671262, 4.699178236))
        make_face()
    cut_extrude8_tool1 = extrude(cut_extrude8_sk1.sketch, amount=-CUT_EXTRUDE8_REACH, mode=Mode.PRIVATE) & part.part
    add(cut_extrude8_tool1.solids().sort_by_distance((19.177, 9.652, 0.027338))[0], mode=Mode.SUBTRACT)

    # Sketch26 → Cut-Extrude11 (cut)
    with SkipClean():  # the faces are left unmerged after this step: merging them gives an invalid solid
        with BuildSketch(Plane(origin=(32.893, 0, 0), x_dir=(0, 0, -1), z_dir=(1, 0, 0)).offset(CUT_EXTRUDE11_START)):
            with BuildLine():
                Line((-5.4991, 0), (5.4991, 0))
                Line((5.4991, 0), (5.4991, 1.27))
                ThreePointArc((5.4991, 1.27), (5.610692316, 1.539407684), (5.8801, 1.651))
                Line((5.8801, 1.651), (10.2235, 1.651))
                Line((10.2235, 1.651), (10.2235, 21.336))
                Line((10.2235, 21.336), (-10.2235, 21.336))
                Line((-10.2235, 21.336), (-10.2235, 1.651))
                Line((-10.2235, 1.651), (-5.8801, 1.651))
                ThreePointArc((-5.8801, 1.651), (-5.610692316, 1.539407684), (-5.4991, 1.27))
                Line((-5.4991, 1.27), (-5.4991, 0))
            make_face()
            with Locations((0, 9.652)):
                Circle(SKETCH26_R, mode=Mode.SUBTRACT)
        extrude(amount=CUT_EXTRUDE11_DEPTH, mode=Mode.SUBTRACT)


solid = part.part
